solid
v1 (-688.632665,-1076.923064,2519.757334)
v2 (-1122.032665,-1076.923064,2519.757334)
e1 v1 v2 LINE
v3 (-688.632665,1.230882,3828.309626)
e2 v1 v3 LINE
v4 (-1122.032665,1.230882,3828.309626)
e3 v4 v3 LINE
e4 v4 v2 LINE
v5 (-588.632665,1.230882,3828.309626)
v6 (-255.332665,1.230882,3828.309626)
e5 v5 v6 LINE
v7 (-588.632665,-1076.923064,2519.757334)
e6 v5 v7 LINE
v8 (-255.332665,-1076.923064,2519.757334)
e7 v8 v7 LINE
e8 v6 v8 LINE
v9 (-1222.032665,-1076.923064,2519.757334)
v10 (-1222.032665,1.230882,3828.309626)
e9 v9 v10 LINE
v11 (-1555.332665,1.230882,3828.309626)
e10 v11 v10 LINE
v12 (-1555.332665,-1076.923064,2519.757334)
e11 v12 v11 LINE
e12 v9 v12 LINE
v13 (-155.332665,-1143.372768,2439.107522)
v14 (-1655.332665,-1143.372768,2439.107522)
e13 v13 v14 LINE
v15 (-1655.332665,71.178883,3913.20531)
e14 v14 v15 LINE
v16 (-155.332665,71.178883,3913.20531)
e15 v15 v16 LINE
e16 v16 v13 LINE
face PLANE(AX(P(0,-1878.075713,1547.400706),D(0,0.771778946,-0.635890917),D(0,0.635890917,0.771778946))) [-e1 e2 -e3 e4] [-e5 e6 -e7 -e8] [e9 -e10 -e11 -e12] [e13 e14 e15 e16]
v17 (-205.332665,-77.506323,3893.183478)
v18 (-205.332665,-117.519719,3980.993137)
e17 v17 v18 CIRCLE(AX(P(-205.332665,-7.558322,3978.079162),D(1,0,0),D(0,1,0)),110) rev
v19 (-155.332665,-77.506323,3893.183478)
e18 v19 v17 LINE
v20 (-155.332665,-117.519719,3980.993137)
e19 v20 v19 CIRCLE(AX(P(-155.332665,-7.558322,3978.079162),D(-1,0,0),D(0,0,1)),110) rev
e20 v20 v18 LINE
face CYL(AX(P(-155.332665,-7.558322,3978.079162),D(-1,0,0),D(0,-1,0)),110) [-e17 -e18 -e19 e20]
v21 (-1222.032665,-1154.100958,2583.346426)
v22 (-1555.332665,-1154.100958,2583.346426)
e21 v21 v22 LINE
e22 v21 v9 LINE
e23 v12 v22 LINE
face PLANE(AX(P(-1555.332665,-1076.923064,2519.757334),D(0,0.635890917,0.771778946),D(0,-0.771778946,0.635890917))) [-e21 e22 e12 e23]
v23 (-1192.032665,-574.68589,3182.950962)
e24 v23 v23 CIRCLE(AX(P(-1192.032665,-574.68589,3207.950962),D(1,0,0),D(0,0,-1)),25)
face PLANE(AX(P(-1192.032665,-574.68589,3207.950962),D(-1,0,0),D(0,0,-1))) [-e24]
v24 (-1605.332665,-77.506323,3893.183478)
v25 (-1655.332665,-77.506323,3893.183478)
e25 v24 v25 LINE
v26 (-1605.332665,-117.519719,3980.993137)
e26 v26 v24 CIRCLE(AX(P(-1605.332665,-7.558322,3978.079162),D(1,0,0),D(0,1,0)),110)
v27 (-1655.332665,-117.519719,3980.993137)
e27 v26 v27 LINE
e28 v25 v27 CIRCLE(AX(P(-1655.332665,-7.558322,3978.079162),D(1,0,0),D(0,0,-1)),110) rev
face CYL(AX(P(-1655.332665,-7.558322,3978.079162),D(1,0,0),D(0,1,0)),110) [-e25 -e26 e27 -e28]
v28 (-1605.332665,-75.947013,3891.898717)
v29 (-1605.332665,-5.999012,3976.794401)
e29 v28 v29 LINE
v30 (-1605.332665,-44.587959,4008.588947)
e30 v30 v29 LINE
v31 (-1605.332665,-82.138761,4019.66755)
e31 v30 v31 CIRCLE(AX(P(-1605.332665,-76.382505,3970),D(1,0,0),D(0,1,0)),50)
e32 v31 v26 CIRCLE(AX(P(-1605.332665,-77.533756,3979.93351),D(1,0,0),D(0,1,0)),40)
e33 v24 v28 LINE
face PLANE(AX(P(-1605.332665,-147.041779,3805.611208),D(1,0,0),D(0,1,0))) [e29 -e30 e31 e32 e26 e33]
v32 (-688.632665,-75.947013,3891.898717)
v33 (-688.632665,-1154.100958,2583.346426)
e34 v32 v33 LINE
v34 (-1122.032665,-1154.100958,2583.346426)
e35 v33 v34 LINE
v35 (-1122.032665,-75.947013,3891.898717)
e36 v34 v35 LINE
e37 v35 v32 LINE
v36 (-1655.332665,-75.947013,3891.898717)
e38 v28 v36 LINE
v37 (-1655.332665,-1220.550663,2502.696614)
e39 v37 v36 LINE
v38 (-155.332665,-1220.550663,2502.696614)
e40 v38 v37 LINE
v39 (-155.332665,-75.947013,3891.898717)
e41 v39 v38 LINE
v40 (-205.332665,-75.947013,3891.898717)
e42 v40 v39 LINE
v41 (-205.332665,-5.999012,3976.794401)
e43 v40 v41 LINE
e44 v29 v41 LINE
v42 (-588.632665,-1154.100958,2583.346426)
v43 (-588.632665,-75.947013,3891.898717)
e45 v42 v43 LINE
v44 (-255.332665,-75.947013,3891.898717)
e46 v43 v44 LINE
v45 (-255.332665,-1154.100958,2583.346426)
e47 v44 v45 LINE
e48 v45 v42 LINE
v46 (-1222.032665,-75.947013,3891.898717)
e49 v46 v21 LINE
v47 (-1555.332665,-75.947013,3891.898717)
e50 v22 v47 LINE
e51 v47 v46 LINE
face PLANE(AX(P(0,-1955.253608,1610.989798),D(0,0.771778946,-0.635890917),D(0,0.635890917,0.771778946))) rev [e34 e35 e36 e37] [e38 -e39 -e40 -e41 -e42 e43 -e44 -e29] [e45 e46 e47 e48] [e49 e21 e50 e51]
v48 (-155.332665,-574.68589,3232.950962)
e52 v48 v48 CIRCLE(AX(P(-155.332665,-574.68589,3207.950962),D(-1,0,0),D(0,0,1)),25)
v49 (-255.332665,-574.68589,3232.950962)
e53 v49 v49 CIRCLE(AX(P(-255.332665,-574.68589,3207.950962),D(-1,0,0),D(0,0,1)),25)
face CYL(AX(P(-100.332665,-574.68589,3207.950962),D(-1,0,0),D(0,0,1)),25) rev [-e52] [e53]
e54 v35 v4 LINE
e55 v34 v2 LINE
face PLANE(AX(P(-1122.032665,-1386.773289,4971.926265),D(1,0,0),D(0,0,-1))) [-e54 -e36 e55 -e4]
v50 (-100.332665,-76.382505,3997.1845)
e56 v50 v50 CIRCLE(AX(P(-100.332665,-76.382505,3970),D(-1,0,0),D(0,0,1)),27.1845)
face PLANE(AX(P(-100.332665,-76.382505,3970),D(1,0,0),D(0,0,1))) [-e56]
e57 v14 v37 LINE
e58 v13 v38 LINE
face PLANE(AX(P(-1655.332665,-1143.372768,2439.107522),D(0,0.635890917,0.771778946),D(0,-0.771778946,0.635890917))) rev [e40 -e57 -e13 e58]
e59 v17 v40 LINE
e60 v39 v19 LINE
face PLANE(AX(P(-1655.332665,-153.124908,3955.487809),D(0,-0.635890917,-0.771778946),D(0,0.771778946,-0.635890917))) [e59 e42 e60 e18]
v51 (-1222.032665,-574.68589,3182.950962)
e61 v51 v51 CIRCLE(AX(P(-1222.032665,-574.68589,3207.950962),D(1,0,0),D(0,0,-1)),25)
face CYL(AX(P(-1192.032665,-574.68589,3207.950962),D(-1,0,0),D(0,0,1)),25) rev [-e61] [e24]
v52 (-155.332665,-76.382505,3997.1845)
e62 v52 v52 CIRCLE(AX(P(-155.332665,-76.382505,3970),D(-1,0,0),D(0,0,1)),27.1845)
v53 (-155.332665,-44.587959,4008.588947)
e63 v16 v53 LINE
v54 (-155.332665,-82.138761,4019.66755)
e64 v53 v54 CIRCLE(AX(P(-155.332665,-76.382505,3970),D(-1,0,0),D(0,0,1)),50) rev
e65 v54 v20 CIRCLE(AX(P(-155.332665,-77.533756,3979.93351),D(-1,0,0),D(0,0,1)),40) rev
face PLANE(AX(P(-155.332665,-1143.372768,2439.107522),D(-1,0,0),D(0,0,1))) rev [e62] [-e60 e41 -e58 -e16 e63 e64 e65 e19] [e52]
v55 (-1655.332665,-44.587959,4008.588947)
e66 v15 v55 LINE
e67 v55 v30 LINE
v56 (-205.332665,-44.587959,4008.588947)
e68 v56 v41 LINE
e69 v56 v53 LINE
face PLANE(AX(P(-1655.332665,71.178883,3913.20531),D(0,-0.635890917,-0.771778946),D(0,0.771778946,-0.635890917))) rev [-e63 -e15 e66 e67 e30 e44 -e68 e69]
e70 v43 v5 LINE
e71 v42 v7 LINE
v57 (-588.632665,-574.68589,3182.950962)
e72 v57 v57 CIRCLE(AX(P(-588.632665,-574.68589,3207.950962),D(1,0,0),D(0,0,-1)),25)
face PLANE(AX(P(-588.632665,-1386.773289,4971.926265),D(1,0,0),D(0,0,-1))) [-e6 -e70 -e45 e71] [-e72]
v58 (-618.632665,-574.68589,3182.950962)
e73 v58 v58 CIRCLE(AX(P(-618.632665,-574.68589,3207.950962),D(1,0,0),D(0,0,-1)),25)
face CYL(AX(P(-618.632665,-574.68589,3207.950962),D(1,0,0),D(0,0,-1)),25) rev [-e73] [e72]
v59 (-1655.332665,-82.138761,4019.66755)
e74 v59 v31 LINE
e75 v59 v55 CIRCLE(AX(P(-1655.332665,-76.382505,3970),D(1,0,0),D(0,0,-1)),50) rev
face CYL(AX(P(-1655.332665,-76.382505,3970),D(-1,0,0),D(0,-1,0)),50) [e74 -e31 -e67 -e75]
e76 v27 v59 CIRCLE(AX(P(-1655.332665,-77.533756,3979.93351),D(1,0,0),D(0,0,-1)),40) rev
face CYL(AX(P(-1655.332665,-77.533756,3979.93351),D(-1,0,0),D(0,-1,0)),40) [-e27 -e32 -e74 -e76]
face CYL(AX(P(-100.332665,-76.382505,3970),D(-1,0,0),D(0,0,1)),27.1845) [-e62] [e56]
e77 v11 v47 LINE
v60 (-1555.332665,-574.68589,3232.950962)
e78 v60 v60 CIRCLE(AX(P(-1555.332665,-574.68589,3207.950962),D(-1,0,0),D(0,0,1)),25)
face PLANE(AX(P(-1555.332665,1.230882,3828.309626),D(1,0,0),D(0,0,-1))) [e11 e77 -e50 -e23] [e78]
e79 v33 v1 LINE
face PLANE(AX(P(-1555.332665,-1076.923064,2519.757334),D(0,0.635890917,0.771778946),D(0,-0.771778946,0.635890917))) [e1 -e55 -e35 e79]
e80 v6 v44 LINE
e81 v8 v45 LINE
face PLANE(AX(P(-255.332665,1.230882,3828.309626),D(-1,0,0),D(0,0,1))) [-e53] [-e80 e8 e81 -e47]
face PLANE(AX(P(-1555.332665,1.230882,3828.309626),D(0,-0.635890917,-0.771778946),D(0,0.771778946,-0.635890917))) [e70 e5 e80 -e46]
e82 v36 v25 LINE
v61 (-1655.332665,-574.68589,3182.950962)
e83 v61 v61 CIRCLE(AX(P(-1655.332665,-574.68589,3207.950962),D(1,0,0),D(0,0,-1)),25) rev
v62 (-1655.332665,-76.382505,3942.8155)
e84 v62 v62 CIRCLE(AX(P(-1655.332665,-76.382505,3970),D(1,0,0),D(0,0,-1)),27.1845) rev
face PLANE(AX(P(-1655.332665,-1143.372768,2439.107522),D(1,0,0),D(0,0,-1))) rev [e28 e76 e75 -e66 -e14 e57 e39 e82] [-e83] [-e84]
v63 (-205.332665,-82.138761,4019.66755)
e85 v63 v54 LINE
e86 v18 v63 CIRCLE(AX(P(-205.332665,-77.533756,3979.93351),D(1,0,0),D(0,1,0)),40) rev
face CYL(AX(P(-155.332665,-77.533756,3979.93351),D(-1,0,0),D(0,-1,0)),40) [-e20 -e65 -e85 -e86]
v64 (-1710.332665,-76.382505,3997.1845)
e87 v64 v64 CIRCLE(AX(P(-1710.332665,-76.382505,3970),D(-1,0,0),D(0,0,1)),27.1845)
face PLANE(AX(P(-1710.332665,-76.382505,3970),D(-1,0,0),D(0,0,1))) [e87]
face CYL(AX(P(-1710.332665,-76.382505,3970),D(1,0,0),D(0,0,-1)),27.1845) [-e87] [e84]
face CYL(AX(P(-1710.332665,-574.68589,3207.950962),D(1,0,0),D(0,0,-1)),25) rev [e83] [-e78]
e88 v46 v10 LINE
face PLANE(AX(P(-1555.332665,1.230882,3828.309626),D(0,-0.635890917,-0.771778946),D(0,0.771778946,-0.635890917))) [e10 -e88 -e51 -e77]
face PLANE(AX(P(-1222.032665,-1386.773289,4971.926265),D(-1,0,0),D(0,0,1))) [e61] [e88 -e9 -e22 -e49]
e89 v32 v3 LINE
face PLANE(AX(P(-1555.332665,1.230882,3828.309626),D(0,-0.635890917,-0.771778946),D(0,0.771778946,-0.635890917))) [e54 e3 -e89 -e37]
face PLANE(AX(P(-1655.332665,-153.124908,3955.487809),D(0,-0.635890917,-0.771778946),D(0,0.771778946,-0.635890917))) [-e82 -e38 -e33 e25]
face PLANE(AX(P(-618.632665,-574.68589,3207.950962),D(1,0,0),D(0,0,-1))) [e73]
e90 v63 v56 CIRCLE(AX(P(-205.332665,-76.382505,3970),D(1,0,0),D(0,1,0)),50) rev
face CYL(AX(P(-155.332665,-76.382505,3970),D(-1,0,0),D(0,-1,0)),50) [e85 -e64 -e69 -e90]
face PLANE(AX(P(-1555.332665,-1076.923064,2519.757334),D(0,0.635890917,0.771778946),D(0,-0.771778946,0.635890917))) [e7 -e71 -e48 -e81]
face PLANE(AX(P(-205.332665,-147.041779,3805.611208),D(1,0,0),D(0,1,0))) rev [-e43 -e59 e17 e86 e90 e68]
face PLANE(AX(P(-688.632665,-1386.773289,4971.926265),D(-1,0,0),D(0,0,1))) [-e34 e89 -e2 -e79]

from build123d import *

# Parameters (mm, degrees)
CROQUIS1_W              = 1500
CROQUIS1_H              = 1910
CROQUIS1_W_2            = 1300
CROQUIS1_H_2            = 1695.501409597
SALIENTE_EXTRUIR1_DEPTH = 100
CROQUIS2_W              = 50
CROQUIS2_H              = 100
SALIENTE_EXTRUIR2_DEPTH = 110
CROQUIS3_R              = 27.184499999
SALIENTE_EXTRUIR3_DEPTH = 55
REDONDEO1_R             = 50
REDONDEO2_R             = 110
REDONDEO3_R             = 40
SIMETR_A6_START         = -205.332665454
SIMETR_A6_DEPTH         = 50
SIMETR_A6_2_OUTLINE_R   = 27.184499999
SIMETR_A6_2_DEPTH       = 105
CROQUIS4_W              = 100
CROQUIS4_H              = 1695.501409597
SALIENTE_EXTRUIR4_DEPTH = 100
CROQUIS5_R              = 25
CORTAR_EXTRUIR1_DEPTH   = 30
CROQUIS6_R              = 25
CORTAR_EXTRUIR3_DEPTH   = 4447.028443617


with BuildPart() as part:
    # Croquis1 → Saliente-Extruir1 (new body)
    with BuildSketch(Plane(origin=(0, -1955.253607577, 1610.989797583), x_dir=(1, 0, 0), z_dir=(0, 0.771778946447621, -0.6358909166045701))):
        with Locations((-905.332665454, -2110.391476147)):
            Rectangle(CROQUIS1_W, CROQUIS1_H)
        with Locations((-905.332665454, -2107.640771349)):
            Rectangle(CROQUIS1_W_2, CROQUIS1_H_2, mode=Mode.SUBTRACT)
    extrude(amount=SALIENTE_EXTRUIR1_DEPTH)

    # Croquis2 → Saliente-Extruir2 (add)
    with BuildSketch(Plane(origin=(0, 1949.254595519, 2365.804603911), x_dir=(1, 0, 0), z_dir=(-5.363902149474557e-15, 0.6358909166045701, 0.771778946447621))):
        with Locations((-1630.332665455, -2583.437348319)):
            Rectangle(CROQUIS2_W, CROQUIS2_H)
    extrude(amount=-SALIENTE_EXTRUIR2_DEPTH)

    # Croquis3 → Saliente-Extruir3 (add)
    with BuildSketch(Plane.ZY.offset(1655.332665454)):
        with Locations(Location((3970.000000001, -76.38250521, 0), (0, 0, 180))):
            Circle(CROQUIS3_R)
    extrude(amount=SALIENTE_EXTRUIR3_DEPTH)

    # Redondeo1
    redondeo1_edges = [part.edges().sort_by_distance(p)[0] for p in [
        (-1630.332665454, -83.176906702, 4040.383493154),
    ]]
    fillet(redondeo1_edges, radius=REDONDEO1_R)

    # Redondeo2
    # the kernel refuses this fillet: 110 mm, written as the material it takes off along each edge
    with BuildSketch(Plane(origin=(-1360.383691176, -153.124907529, 3955.487809045), x_dir=(-5.363902149475724e-15, 0.6358909166045759, 0.7717789464476161), z_dir=(-1, 0, 0))) as redondeo2_piece_1:
        with BuildLine():
            CenterArc((110, 97.979589711), REDONDEO2_R, 180, 62.964308211)
            Line((0, 97.979589711), (0, 0))
            Line((0, 0), (60, 0))
        make_face()
    extrude(amount=539.897948557, mode=Mode.SUBTRACT)

    # Redondeo3
    redondeo3_edges = [part.edges().sort_by_distance(p)[0] for p in [
        (-1630.332665454, -114.971452533, 4001.794545831),
    ]]
    fillet(redondeo3_edges, radius=REDONDEO3_R)

    # Simetría6: read off the stored shape, not the designer's step
    # Simetría6 outline → Simetría6 (add)
    with BuildSketch(Plane.YZ.offset(SIMETR_A6_START)):
        with BuildLine():
            ThreePointArc((-117.519718806, 3980.993137388), (-107.655684266, 3932.466465304), (-77.506323008, 3893.183477935))
            Line((-77.506323008, 3893.183477935), (-75.947012884, 3891.898717384))
            Line((-75.947012884, 3891.898717384), (-5.999012058, 3976.794401493))
            Line((-5.999012058, 3976.794401493), (-44.58795938, 4008.588947324))
            ThreePointArc((-44.58795938, 4008.588947324), (-62.233936584, 4017.956417776), (-82.138761146, 4019.667549947))
            ThreePointArc((-82.138761146, 4019.667549947), (-107.046738875, 4006.933211198), (-117.519718806, 3980.993137388))
        make_face()
    extrude(amount=SIMETR_A6_DEPTH)

    # Simetr_a6 2 outline → Simetr_a6 2 (add)
    with BuildSketch(Plane.YZ.offset(SIMETR_A6_START)):
        with Locations((-76.38250521, 3970.000000001)):
            Circle(SIMETR_A6_2_OUTLINE_R)
    extrude(amount=SIMETR_A6_2_DEPTH)

    # Croquis4 → Saliente-Extruir4 (add)
    with BuildSketch(Plane(origin=(0, -1878.075712932, 1547.400705922), x_dir=(1, 0, 0), z_dir=(0, 0.771778946447621, -0.63589091660457))):
        with Locations((-1172.032665454, -2107.640771349)):
            Rectangle(CROQUIS4_W, CROQUIS4_H)
        with Locations((-638.632665454, -2107.640771349)):
            Rectangle(CROQUIS4_W, CROQUIS4_H)
    extrude(amount=-SALIENTE_EXTRUIR4_DEPTH)

    # Croquis5 → Cortar-Extruir1 (cut)
    with BuildSketch(Plane(origin=(-588.632665454, 0, 0), x_dir=(0, 0, -1), z_dir=(1, 0, 0))):
        with Locations((-3207.950961806, -574.685890092)):
            Circle(CROQUIS5_R)
    cortar_extruir1 = extrude(amount=-CORTAR_EXTRUIR1_DEPTH, mode=Mode.SUBTRACT)

    # Croquis6 → Cortar-Extruir3 (cut, through all)
    with BuildSketch(Plane.ZY.offset(255.332665454)):
        with Locations(Location((3207.950961806, -574.685890092, 0), (0, 0, 180))):
            Circle(CROQUIS6_R)
    cortar_extruir3 = extrude(amount=-CORTAR_EXTRUIR3_DEPTH, mode=Mode.SUBTRACT)

    # Simetría11: Cortar-Extruir1, Cortar-Extruir3 across plane
    add(cortar_extruir1.mirror(Plane(origin=(-905.332665454, 0, 0), x_dir=(0, 0, 1), z_dir=(1, 0, 0))), mode=Mode.SUBTRACT)
    add(cortar_extruir3.mirror(Plane(origin=(-905.332665454, 0, 0), x_dir=(0, 0, 1), z_dir=(1, 0, 0))), mode=Mode.SUBTRACT)


solid = part.part
